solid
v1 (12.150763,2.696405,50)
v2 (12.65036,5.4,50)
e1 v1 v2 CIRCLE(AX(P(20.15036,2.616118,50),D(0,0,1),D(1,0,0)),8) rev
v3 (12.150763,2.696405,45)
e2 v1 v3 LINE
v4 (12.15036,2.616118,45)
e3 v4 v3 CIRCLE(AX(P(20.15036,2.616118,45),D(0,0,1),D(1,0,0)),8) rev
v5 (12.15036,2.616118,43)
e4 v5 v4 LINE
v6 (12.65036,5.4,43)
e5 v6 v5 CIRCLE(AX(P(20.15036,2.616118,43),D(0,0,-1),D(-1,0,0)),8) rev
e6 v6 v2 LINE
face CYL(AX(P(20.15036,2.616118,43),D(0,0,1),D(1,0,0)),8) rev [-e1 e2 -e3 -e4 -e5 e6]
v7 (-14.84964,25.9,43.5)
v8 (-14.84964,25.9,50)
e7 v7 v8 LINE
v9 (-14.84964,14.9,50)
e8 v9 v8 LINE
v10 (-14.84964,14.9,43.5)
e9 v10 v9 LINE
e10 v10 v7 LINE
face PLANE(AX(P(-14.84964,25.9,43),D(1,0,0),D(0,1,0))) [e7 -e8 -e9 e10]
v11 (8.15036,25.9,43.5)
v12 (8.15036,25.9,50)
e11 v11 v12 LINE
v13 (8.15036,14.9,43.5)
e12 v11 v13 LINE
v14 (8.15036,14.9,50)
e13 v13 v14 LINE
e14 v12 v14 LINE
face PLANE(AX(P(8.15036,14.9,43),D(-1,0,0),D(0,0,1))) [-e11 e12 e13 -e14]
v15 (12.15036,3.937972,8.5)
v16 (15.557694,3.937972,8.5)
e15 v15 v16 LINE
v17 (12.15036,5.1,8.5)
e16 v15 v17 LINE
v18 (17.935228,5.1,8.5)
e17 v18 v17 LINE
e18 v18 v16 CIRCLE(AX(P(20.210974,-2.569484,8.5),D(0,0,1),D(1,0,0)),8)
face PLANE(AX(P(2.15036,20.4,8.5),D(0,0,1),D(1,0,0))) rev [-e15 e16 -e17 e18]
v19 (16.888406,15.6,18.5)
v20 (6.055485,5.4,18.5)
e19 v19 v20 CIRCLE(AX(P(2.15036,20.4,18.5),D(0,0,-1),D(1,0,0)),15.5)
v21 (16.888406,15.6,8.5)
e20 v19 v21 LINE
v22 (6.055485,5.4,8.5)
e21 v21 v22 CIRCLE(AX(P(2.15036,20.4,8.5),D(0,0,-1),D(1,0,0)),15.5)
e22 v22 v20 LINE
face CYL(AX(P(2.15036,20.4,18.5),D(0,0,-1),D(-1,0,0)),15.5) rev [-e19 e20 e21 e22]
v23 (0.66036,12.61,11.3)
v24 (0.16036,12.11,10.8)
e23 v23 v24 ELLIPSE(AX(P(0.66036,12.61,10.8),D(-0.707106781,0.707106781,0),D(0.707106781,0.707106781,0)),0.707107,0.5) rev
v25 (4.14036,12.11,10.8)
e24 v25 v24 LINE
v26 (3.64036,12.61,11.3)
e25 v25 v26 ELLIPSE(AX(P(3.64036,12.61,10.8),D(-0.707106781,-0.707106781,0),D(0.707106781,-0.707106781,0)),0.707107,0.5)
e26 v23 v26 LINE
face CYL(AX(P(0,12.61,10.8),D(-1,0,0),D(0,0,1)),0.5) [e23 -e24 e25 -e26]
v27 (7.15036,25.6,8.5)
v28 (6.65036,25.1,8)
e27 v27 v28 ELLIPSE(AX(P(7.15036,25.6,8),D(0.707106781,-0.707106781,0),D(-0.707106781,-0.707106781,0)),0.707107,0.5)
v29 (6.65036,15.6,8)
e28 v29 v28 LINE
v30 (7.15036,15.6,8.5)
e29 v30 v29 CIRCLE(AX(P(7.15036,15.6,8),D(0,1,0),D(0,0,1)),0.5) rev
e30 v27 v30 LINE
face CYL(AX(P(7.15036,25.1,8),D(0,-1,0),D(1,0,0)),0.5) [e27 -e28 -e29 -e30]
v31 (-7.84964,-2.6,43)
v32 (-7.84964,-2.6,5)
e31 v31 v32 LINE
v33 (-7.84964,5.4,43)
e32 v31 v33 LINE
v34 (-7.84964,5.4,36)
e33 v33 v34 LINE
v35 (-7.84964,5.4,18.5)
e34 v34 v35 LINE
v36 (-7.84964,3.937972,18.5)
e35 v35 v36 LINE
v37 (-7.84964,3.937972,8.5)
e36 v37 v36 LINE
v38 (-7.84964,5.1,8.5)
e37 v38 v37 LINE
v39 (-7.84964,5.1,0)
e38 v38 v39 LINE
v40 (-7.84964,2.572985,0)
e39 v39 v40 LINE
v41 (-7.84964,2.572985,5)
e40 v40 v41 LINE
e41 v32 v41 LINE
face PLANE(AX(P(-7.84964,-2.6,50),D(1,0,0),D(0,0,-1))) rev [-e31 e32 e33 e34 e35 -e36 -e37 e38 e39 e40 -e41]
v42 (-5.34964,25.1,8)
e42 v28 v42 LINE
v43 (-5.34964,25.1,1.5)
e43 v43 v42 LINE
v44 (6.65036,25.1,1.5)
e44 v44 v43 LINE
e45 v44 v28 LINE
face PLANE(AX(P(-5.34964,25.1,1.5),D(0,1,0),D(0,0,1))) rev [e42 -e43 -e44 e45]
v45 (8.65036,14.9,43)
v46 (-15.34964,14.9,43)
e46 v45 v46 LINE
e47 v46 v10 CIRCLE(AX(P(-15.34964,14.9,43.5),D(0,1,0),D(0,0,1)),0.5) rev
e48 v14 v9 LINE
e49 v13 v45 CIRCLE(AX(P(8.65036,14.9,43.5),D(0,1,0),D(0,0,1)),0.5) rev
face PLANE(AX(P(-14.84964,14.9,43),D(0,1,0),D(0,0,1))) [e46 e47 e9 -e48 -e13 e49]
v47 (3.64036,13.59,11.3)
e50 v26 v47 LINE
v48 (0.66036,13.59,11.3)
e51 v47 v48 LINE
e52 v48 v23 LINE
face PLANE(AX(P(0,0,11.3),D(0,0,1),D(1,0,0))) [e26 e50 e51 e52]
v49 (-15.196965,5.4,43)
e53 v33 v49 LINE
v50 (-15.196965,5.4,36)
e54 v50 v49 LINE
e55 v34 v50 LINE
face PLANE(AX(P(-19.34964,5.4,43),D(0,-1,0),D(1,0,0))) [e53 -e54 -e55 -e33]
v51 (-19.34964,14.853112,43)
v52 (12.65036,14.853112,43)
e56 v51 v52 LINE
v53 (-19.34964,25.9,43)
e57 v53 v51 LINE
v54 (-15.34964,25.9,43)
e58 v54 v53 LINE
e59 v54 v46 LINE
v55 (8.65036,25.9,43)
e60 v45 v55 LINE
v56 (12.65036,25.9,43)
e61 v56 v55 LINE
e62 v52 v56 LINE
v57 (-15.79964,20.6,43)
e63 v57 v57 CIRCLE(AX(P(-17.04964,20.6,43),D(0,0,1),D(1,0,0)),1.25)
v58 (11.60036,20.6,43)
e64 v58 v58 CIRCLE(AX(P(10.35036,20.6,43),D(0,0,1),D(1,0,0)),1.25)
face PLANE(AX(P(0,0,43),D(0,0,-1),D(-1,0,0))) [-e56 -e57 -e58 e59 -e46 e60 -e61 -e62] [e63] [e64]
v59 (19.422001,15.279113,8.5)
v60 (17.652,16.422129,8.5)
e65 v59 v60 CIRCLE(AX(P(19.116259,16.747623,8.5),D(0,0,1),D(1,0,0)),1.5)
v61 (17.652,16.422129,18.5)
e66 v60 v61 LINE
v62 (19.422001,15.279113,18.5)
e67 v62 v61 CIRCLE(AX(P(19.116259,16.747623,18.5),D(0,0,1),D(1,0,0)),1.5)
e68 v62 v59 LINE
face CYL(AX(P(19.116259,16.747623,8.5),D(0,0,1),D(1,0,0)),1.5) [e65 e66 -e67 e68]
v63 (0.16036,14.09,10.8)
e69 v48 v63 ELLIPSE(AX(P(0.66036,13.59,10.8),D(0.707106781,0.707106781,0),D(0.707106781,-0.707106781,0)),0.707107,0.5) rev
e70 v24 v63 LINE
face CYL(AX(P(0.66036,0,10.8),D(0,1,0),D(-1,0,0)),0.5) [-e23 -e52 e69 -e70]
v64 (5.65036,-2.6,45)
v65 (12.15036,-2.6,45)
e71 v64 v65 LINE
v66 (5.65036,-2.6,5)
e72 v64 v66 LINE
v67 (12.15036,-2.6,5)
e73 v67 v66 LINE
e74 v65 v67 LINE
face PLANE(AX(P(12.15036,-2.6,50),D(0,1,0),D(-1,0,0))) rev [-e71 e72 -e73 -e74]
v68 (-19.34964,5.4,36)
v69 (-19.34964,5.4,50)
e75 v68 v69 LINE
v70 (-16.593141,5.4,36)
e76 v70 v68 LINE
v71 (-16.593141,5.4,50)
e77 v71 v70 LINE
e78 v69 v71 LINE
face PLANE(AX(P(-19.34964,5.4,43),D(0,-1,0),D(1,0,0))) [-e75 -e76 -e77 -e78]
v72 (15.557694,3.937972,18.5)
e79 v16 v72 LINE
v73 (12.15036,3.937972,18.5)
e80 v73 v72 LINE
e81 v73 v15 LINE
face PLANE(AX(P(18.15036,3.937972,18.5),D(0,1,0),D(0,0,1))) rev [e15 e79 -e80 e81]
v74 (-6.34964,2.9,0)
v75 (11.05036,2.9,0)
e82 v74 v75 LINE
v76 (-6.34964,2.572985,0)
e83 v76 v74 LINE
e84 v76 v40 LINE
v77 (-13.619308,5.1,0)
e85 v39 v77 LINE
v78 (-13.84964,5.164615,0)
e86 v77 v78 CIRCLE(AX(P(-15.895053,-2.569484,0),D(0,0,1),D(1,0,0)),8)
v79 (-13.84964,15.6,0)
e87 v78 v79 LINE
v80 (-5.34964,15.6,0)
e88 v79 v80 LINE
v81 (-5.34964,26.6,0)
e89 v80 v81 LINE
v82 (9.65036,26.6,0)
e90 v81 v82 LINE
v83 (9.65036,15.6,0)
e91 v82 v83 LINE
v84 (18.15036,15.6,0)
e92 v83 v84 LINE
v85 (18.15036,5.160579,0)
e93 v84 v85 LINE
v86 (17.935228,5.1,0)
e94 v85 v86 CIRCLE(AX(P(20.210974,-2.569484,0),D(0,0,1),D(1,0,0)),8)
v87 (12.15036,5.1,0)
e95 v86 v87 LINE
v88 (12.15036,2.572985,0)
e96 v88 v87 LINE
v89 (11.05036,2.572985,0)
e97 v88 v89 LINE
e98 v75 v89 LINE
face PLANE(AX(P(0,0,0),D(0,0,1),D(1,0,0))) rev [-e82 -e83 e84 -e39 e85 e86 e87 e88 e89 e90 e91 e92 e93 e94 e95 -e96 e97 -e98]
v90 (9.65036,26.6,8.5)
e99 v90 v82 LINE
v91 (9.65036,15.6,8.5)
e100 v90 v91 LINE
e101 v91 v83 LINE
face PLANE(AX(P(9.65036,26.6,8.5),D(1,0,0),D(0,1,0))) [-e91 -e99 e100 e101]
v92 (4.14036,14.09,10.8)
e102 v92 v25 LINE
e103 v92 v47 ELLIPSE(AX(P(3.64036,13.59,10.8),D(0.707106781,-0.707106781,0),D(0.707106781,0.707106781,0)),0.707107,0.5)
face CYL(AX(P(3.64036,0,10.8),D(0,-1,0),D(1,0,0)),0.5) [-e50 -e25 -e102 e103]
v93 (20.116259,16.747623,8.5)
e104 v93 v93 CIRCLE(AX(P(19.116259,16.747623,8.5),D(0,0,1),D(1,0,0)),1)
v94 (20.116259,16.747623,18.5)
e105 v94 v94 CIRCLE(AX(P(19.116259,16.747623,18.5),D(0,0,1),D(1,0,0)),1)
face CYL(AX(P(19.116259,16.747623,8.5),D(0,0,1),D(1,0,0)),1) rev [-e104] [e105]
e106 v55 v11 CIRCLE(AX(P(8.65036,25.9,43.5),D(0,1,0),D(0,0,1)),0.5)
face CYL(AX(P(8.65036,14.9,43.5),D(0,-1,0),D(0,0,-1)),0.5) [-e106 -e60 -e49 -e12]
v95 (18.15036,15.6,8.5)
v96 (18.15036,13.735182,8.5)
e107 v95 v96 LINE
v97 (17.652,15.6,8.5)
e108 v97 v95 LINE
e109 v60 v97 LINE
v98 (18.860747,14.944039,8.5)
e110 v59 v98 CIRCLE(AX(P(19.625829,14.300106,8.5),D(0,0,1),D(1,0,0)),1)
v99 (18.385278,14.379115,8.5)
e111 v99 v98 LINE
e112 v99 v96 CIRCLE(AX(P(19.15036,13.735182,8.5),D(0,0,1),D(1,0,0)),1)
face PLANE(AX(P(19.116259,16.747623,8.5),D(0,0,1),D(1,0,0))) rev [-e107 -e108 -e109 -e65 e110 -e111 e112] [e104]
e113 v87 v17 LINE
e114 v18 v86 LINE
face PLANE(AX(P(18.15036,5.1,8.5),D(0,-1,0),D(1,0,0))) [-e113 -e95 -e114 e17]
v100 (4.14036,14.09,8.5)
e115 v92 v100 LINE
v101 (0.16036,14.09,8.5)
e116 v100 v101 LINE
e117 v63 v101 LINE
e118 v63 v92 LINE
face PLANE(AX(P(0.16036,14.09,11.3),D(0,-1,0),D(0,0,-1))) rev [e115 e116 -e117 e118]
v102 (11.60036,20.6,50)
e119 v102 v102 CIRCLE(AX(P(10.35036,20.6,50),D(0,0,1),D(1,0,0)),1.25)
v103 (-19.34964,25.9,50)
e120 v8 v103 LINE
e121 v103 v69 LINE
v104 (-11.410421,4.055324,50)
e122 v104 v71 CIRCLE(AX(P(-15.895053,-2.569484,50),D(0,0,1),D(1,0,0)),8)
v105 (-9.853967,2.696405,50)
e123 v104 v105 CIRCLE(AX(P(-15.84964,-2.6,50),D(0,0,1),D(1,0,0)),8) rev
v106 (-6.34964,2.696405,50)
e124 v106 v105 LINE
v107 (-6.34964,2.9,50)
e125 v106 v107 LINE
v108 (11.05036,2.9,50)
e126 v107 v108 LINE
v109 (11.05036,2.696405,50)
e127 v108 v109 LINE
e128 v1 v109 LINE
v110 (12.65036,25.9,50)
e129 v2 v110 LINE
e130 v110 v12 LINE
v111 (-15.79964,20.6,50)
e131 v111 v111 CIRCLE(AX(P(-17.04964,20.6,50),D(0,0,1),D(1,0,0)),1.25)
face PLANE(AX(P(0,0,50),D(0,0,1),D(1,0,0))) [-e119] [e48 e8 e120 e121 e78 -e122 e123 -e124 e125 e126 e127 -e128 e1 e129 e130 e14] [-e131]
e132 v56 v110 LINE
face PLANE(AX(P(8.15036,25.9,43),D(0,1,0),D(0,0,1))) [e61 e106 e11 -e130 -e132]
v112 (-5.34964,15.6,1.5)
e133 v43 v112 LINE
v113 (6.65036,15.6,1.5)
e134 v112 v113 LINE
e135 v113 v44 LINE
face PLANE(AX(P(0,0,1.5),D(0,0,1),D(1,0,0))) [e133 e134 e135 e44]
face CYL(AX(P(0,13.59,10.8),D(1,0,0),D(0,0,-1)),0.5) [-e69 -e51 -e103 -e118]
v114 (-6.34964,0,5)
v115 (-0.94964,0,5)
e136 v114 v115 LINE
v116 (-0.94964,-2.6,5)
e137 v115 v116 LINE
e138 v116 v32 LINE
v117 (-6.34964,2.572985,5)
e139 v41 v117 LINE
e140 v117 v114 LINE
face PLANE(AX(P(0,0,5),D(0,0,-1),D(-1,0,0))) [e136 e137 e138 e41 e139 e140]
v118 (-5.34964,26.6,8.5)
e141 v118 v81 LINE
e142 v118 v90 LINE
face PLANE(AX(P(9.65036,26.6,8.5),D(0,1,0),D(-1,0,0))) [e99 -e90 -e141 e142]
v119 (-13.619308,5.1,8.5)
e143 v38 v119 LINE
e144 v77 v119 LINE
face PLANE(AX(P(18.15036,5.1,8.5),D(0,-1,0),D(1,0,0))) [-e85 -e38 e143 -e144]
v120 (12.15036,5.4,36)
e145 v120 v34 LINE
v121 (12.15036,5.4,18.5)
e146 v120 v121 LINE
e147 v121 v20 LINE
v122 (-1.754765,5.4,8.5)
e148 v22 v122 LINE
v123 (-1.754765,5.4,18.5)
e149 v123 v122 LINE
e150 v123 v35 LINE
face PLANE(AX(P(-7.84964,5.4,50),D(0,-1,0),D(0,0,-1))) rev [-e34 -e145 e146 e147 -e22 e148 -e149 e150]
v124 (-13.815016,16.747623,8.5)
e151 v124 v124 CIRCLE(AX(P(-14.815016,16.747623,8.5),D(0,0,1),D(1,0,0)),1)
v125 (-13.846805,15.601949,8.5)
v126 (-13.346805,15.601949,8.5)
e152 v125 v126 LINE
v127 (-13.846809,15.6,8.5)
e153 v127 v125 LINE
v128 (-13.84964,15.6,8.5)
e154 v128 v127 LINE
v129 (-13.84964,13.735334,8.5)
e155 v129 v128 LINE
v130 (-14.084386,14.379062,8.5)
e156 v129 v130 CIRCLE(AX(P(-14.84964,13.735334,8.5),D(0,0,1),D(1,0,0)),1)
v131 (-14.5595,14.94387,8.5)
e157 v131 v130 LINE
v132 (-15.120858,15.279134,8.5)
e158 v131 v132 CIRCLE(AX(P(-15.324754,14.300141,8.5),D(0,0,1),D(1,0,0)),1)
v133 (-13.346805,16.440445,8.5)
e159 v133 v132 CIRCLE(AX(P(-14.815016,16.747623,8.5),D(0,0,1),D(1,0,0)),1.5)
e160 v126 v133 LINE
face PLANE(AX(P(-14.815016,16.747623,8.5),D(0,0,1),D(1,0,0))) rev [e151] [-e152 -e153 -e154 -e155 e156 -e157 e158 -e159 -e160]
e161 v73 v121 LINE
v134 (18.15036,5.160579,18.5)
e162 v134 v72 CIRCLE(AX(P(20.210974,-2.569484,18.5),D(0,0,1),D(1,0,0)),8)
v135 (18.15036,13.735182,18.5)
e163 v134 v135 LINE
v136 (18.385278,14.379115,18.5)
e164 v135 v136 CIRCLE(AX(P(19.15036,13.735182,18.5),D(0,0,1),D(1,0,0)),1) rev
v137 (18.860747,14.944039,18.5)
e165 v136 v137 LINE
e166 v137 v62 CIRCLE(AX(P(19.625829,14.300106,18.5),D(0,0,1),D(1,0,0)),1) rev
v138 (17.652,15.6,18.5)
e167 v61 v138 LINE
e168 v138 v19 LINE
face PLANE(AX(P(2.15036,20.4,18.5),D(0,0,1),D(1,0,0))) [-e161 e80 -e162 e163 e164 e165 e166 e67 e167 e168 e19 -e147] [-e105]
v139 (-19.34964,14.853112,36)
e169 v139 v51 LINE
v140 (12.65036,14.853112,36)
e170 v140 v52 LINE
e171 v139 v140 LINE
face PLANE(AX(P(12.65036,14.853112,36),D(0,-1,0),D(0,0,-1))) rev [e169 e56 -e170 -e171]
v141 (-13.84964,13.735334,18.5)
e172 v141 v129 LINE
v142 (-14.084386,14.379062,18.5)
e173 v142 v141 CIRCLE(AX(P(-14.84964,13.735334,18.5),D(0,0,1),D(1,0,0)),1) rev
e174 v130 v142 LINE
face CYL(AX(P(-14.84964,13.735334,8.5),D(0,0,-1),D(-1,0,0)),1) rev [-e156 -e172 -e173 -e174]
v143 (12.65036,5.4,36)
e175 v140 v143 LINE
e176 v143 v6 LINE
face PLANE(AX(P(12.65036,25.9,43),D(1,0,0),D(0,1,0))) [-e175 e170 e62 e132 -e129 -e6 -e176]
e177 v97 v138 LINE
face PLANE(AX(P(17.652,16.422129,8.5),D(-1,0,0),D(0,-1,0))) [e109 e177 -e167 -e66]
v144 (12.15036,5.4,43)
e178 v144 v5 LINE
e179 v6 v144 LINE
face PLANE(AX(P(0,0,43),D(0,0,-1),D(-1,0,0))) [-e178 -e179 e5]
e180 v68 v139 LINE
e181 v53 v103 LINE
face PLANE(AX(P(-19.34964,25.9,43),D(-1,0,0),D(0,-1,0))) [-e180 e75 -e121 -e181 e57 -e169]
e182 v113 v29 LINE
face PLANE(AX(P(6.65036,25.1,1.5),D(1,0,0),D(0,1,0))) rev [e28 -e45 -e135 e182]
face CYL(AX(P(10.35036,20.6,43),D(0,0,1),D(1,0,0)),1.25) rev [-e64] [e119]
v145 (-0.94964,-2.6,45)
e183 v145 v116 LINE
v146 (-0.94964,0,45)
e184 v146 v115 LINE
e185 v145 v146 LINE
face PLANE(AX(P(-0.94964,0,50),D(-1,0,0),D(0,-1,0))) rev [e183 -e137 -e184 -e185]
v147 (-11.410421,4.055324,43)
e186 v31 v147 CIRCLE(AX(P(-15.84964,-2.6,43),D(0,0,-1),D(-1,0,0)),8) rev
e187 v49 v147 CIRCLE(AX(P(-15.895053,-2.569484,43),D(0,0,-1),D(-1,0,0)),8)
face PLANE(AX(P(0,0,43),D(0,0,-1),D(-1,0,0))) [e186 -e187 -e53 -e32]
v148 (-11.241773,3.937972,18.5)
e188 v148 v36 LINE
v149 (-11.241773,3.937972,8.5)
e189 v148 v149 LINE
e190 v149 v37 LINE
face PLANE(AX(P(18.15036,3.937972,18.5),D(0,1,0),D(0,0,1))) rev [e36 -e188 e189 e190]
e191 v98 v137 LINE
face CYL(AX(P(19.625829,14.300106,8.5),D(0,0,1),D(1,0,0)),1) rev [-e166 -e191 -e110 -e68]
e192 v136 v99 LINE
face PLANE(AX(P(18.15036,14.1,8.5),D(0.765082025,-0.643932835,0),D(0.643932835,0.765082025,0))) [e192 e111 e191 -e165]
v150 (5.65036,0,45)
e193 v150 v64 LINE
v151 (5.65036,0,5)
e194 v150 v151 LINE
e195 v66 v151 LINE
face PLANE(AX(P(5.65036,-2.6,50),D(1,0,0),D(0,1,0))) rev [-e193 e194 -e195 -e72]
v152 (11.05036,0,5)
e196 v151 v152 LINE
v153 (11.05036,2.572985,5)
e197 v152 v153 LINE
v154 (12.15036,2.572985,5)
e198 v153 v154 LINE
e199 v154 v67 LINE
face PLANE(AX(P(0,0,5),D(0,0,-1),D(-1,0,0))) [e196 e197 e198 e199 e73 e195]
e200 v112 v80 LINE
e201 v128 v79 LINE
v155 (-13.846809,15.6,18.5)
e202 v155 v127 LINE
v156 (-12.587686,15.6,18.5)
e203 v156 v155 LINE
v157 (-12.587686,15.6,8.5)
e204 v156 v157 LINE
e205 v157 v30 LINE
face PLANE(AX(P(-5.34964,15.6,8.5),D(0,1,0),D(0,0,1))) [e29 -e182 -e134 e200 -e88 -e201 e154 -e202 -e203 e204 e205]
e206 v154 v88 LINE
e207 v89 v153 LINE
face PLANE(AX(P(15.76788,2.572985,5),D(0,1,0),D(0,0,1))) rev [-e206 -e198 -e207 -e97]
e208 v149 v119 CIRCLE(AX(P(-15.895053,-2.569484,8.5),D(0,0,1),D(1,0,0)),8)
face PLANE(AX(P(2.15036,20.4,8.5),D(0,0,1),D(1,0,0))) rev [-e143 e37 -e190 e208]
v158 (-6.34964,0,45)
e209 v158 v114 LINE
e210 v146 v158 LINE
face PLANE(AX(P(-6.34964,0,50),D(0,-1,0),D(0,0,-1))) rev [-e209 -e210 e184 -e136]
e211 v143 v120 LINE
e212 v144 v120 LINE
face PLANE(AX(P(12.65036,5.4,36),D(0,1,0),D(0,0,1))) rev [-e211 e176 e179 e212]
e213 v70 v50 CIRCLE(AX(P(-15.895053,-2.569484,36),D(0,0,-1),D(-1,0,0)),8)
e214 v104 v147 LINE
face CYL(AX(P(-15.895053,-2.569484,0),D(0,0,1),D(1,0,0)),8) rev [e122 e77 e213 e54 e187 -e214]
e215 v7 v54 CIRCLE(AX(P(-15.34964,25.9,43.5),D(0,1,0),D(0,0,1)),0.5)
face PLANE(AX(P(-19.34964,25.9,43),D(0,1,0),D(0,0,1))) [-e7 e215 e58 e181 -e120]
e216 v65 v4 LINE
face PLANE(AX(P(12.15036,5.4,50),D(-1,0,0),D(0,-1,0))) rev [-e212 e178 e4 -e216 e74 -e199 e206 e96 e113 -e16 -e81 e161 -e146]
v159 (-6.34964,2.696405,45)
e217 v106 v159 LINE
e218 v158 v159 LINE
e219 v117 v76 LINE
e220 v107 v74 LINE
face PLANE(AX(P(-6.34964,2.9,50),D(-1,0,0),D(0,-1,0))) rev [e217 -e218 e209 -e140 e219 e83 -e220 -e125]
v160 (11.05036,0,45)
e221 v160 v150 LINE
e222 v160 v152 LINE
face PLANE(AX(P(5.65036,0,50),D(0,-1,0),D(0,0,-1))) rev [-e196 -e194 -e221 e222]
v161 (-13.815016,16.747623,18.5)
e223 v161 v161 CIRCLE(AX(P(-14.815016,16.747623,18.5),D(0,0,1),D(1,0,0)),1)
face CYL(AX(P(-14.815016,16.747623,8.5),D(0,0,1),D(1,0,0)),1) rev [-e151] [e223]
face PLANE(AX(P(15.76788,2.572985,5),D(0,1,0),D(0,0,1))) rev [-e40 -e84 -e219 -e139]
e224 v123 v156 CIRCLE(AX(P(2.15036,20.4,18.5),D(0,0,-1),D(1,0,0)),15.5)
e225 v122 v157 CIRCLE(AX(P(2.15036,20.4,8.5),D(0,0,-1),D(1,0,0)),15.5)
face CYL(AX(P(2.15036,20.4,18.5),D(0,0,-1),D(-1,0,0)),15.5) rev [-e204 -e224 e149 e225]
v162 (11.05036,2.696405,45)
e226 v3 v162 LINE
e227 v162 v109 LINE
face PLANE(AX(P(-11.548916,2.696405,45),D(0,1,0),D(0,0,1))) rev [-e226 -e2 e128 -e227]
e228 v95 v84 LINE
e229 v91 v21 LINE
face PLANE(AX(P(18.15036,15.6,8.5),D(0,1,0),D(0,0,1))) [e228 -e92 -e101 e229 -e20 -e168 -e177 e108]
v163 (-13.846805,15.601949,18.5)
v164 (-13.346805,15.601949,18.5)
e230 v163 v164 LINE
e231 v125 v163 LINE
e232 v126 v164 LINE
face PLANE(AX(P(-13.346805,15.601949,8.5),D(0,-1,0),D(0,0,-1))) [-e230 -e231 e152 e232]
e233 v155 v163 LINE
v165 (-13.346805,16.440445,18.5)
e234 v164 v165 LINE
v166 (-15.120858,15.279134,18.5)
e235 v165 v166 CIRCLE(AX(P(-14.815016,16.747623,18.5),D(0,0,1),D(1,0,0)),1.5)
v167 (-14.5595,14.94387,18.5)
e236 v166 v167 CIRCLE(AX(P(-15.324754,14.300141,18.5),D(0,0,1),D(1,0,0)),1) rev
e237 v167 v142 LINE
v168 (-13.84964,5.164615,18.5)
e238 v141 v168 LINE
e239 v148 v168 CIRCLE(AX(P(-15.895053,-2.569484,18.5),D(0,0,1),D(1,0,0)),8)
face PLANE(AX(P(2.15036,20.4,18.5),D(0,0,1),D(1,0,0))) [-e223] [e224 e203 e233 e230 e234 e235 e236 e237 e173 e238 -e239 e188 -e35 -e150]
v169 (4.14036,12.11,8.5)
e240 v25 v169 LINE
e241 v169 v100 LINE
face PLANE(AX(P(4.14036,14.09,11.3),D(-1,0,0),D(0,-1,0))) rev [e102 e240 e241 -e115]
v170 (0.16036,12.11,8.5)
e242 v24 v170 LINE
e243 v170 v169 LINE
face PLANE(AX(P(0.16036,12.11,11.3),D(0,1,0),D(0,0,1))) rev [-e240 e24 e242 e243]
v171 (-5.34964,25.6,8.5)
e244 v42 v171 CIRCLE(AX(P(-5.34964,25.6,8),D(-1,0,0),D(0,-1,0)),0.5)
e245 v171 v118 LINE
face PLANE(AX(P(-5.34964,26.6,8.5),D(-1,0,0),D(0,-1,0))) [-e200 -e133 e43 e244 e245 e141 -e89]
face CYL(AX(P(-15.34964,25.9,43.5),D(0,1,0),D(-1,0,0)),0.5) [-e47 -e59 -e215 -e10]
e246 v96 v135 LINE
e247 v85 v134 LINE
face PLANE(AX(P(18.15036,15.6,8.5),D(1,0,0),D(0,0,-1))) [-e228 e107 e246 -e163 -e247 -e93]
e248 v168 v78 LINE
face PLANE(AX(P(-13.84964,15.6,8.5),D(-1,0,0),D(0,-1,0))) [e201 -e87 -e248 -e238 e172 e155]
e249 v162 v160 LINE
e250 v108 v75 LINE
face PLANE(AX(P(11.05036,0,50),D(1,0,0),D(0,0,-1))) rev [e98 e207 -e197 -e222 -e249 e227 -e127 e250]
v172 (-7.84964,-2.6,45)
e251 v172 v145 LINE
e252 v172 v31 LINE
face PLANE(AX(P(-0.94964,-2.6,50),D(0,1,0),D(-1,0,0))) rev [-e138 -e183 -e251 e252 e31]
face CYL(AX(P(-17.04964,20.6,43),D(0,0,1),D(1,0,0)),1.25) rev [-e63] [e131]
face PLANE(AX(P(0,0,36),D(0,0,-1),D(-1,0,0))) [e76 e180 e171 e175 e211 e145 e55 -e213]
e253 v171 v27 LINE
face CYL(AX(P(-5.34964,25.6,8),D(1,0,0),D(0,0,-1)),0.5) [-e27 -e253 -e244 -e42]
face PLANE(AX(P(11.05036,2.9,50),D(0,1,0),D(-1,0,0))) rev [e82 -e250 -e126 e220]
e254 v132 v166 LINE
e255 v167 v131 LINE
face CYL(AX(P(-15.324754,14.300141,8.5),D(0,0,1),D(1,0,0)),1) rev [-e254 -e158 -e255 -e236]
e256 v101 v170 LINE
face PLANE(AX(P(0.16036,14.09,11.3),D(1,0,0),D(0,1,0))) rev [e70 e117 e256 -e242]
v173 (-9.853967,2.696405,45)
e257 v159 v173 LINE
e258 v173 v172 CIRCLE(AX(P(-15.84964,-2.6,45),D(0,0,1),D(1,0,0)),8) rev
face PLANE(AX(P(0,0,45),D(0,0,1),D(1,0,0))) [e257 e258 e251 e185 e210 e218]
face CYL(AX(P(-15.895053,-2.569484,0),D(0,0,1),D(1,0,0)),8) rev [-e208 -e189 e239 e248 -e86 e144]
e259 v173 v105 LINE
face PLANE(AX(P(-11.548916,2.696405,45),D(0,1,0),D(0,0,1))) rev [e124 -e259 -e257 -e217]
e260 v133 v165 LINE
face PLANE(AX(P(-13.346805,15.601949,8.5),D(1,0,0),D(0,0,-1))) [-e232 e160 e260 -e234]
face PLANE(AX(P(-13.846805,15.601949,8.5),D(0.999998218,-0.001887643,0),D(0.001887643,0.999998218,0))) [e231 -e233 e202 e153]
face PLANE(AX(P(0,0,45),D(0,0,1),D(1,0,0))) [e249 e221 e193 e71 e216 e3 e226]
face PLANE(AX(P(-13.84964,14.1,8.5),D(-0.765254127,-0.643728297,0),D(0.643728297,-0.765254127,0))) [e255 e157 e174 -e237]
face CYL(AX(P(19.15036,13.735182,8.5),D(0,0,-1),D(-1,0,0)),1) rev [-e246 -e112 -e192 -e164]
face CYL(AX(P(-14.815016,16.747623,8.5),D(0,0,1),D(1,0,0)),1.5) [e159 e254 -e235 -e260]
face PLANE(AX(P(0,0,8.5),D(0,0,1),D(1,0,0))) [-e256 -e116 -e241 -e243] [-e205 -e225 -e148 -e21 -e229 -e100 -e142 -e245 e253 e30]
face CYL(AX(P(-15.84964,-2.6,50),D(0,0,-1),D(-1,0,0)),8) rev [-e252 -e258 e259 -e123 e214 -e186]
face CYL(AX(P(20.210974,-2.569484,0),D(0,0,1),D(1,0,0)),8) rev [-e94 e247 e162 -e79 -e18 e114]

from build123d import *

# Parameters (mm, degrees)
BOSS_EXTRUDE1_DEPTH = 50
SKETCH2_R           = 1.25
BOSS_EXTRUDE2_DEPTH = 7
FILLET1_R           = 8
BOSS_EXTRUDE3_DEPTH = 8.5
SKETCH7_W           = 12
SKETCH7_H           = 9.5
CUT_EXTRUDE1_DEPTH  = 7
BOSS_EXTRUDE4_DEPTH = 10
SKETCH9_W           = 3.98
SKETCH9_H           = 1.98
BOSS_EXTRUDE5_DEPTH = 2.8
SKETCH11_W          = 32
SKETCH11_H          = 9.453112349
BOSS_EXTRUDE6_DEPTH = 7
SKETCH16_R          = 1
BOSS_EXTRUDE7_DEPTH = 10
FILLET2_R           = 1
FILLET4_R           = 0.5
FILLET5_R           = 0.5
FILLET6_R           = 0.5
SKETCH17_R          = 8
CUT_EXTRUDE2_DEPTH  = 61.270972563
SKETCH18_W          = 26.905399266
SKETCH18_H          = 5.924124609
CUT_EXTRUDE3_DEPTH  = 5
SKETCH19_W          = 27.645914842
SKETCH19_H          = 7.775413549
CUT_EXTRUDE4_DEPTH  = 5


with BuildPart() as part:
    # Sketch1 → Boss-Extrude1 (new body)
    with BuildSketch(Plane.XY):
        Polygon((-6.349640288, 0), (-0.949640288, 0), (-0.949640288, -2.6), (-7.849640288, -2.6), (-7.849640288, 5.4), (12.150359712, 5.4), (12.150359712, -2.6), (5.650359712, -2.6), (5.650359712, 0), (11.050359712, 0), (11.050359712, 2.9), (-6.349640288, 2.9), align=None)
    extrude(amount=BOSS_EXTRUDE1_DEPTH)

    # Sketch2 → Boss-Extrude2 (add)
    with BuildSketch(Plane.XY.offset(50)):
        Polygon((-19.349640288, 25.9), (-19.349640288, 5.4), (12.650359712, 5.4), (12.650359712, 25.9), (8.150359712, 25.9), (8.150359712, 14.9), (-14.849640288, 14.9), (-14.849640288, 25.9), align=None)
        with Locations((10.350359712, 20.6)):
            Circle(SKETCH2_R, mode=Mode.SUBTRACT)
        with Locations((-17.049640288, 20.6)):
            Circle(SKETCH2_R, mode=Mode.SUBTRACT)
    extrude(amount=-BOSS_EXTRUDE2_DEPTH)

    # Fillet1
    # the kernel refuses this fillet: 8 mm, written as the material it adds along each edge
    with BuildSketch(Plane(origin=(-7.849640288, 5.4, 43), x_dir=(0, -1, 0), z_dir=(0, 0, 1))) as fillet1_piece_1:
        with BuildLine():
            CenterArc((FILLET1_R, -FILLET1_R), FILLET1_R, 90, 90)
            Line((0, -FILLET1_R), (0, 0))
            Line((0, 0), (FILLET1_R, 0))
        make_face()
    extrude(amount=7)
    with BuildSketch(Plane(origin=(12.150359712, 5.4, 43), x_dir=(0, -1, 0), z_dir=(0, 0, 1))) as fillet1_piece_2:
        with BuildLine():
            CenterArc((2.783882181, 8), FILLET1_R, 249.635865194, 20.364134806)
            Line((0, 0.5), (0, 0))
            Line((0, 0), (2.783882181, 0))
        make_face()
    extrude(amount=7)

    # Sketch4 → Boss-Extrude3 (add)
    with BuildSketch(Plane(origin=(0, 0, 0), x_dir=(-1, 0, 0), z_dir=(0, 0, -1))):
        Polygon((-18.150359712, 15.6), (-18.150359712, 5.1), (13.849640288, 5.1), (13.849640288, 15.6), (5.349640288, 15.6), (5.349640288, 26.6), (-9.650359712, 26.6), (-9.650359712, 15.6), align=None)
    extrude(amount=-BOSS_EXTRUDE3_DEPTH)

    # Sketch7 → Cut-Extrude1 (cut)
    with BuildSketch(Plane.XY.offset(8.5)):
        with Locations((0.650359712, 20.35)):
            Rectangle(SKETCH7_W, SKETCH7_H)
    extrude(amount=-CUT_EXTRUDE1_DEPTH, mode=Mode.SUBTRACT)

    # Sketch8 → Boss-Extrude4 (add)
    with BuildSketch(Plane.XY.offset(8.5)):
        with BuildLine():
            Line((-13.849640288, 15.6), (-12.587686291, 15.6))
            ThreePointArc((-12.587686291, 15.6), (2.150359712, 4.9), (16.888405716, 15.6))
            Line((16.888405716, 15.6), (18.150359712, 15.6))
            Line((18.150359712, 15.6), (18.150359712, 3.937972429))
            Line((18.150359712, 3.937972429), (-13.849640288, 3.937972429))
            Line((-13.849640288, 3.937972429), (-13.849640288, 15.6))
        make_face()
    extrude(amount=BOSS_EXTRUDE4_DEPTH)

    # Sketch9 → Boss-Extrude5 (add)
    with BuildSketch(Plane.XY.offset(8.5)):
        with Locations((2.150359712, 13.1)):
            Rectangle(SKETCH9_W, SKETCH9_H)
    extrude(amount=BOSS_EXTRUDE5_DEPTH)

    # Sketch11 → Boss-Extrude6 (add)
    with BuildSketch(Plane(origin=(0, 0, 43), x_dir=(-1, 0, 0), z_dir=(0, 0, -1))):
        with Locations((3.349640288, 10.126556175)):
            Rectangle(SKETCH11_W, SKETCH11_H)
    extrude(amount=BOSS_EXTRUDE6_DEPTH)

    # Sketch16 → Boss-Extrude7 (add)
    # profile 1 of 2: a face of its own
    with BuildSketch(Plane.XY.offset(18.5)):
        with BuildLine():
            Line((-13.346805139, 15.601949196), (-13.846805139, 15.601949196))
            Line((-13.846805139, 15.601949196), (-13.849640288, 14.1))
            Line((-13.849640288, 14.1), (-14.815015575, 15.247623037))
            ThreePointArc((-14.815015575, 15.247623037), (-15.7608574, 17.911832315), (-13.346805139, 16.44044538))
            Line((-13.346805139, 16.44044538), (-13.346805139, 15.601949196))
        make_face()
        with Locations((-14.815015575, 16.747623037)):
            Circle(SKETCH16_R, mode=Mode.SUBTRACT)
    # profile 2 of 2: a face of its own
    with BuildSketch(Plane.XY.offset(18.5)):
        with BuildLine():
            Line((17.652000257, 15.6), (18.150359712, 15.6))
            Line((18.150359712, 15.6), (18.150359712, 14.1))
            Line((18.150359712, 14.1), (19.116258964, 15.247623037))
            ThreePointArc((19.116258964, 15.247623037), (20.054810716, 17.91771731), (17.652000257, 16.422128892))
            Line((17.652000257, 16.422128892), (17.652000257, 15.6))
        make_face()
        with Locations((19.116258964, 16.747623037)):
            Circle(SKETCH16_R, mode=Mode.SUBTRACT)
    extrude(amount=-BOSS_EXTRUDE7_DEPTH)

    # Fillet2
    fillet2_edges = [part.edges().sort_by_distance(p)[0] for p in [
        (-13.849640288, 14.1, 13.5),
        (-14.815015575, 15.247623037, 13.5),
        (19.116258964, 15.247623037, 13.5),
        (18.150359712, 14.1, 13.5),
    ]]
    fillet(fillet2_edges, radius=FILLET2_R)

    # Fillet4
    fillet4_edges = [part.edges().sort_by_distance(p)[0] for p in [
        (0.160359712, 13.1, 11.3),
        (2.150359712, 12.11, 11.3),
        (4.140359712, 13.1, 11.3),
        (2.150359712, 14.09, 11.3),
    ]]
    fillet(fillet4_edges, radius=FILLET4_R)

    # Fillet5
    fillet5_edges = [part.edges().sort_by_distance(p)[0] for p in [
        (6.650359712, 20.35, 8.5),
        (0.650359712, 25.1, 8.5),
    ]]
    fillet(fillet5_edges, radius=FILLET5_R)

    # Fillet6
    fillet6_edges = [part.edges().sort_by_distance(p)[0] for p in [
        (-14.849640288, 20.4, 43),
        (8.150359712, 20.4, 43),
    ]]
    fillet(fillet6_edges, radius=FILLET6_R)

    # Sketch17 → Cut-Extrude2 (cut, through all)
    with BuildSketch(Plane.XY.offset(50)):
        with Locations((-15.895053234, -2.569483857)):
            Circle(SKETCH17_R)
        with Locations((20.210973801, -2.569483857)):
            Circle(SKETCH17_R)
    extrude(amount=-CUT_EXTRUDE2_DEPTH, mode=Mode.SUBTRACT)

    # Sketch18 → Cut-Extrude3 (cut)
    with BuildSketch(Plane.XY.offset(50)):
        with Locations((1.903783169, -0.265657621)):
            Rectangle(SKETCH18_W, SKETCH18_H)
    extrude(amount=-CUT_EXTRUDE3_DEPTH, mode=Mode.SUBTRACT)

    # Sketch19 → Cut-Extrude4 (cut)
    with BuildSketch(Plane(origin=(0, 0, 0), x_dir=(-1, 0, 0), z_dir=(0, 0, -1))):
        with Locations((-1.944922923, -1.314721353)):
            Rectangle(SKETCH19_W, SKETCH19_H)
    extrude(amount=-CUT_EXTRUDE4_DEPTH, mode=Mode.SUBTRACT)


solid = part.part
